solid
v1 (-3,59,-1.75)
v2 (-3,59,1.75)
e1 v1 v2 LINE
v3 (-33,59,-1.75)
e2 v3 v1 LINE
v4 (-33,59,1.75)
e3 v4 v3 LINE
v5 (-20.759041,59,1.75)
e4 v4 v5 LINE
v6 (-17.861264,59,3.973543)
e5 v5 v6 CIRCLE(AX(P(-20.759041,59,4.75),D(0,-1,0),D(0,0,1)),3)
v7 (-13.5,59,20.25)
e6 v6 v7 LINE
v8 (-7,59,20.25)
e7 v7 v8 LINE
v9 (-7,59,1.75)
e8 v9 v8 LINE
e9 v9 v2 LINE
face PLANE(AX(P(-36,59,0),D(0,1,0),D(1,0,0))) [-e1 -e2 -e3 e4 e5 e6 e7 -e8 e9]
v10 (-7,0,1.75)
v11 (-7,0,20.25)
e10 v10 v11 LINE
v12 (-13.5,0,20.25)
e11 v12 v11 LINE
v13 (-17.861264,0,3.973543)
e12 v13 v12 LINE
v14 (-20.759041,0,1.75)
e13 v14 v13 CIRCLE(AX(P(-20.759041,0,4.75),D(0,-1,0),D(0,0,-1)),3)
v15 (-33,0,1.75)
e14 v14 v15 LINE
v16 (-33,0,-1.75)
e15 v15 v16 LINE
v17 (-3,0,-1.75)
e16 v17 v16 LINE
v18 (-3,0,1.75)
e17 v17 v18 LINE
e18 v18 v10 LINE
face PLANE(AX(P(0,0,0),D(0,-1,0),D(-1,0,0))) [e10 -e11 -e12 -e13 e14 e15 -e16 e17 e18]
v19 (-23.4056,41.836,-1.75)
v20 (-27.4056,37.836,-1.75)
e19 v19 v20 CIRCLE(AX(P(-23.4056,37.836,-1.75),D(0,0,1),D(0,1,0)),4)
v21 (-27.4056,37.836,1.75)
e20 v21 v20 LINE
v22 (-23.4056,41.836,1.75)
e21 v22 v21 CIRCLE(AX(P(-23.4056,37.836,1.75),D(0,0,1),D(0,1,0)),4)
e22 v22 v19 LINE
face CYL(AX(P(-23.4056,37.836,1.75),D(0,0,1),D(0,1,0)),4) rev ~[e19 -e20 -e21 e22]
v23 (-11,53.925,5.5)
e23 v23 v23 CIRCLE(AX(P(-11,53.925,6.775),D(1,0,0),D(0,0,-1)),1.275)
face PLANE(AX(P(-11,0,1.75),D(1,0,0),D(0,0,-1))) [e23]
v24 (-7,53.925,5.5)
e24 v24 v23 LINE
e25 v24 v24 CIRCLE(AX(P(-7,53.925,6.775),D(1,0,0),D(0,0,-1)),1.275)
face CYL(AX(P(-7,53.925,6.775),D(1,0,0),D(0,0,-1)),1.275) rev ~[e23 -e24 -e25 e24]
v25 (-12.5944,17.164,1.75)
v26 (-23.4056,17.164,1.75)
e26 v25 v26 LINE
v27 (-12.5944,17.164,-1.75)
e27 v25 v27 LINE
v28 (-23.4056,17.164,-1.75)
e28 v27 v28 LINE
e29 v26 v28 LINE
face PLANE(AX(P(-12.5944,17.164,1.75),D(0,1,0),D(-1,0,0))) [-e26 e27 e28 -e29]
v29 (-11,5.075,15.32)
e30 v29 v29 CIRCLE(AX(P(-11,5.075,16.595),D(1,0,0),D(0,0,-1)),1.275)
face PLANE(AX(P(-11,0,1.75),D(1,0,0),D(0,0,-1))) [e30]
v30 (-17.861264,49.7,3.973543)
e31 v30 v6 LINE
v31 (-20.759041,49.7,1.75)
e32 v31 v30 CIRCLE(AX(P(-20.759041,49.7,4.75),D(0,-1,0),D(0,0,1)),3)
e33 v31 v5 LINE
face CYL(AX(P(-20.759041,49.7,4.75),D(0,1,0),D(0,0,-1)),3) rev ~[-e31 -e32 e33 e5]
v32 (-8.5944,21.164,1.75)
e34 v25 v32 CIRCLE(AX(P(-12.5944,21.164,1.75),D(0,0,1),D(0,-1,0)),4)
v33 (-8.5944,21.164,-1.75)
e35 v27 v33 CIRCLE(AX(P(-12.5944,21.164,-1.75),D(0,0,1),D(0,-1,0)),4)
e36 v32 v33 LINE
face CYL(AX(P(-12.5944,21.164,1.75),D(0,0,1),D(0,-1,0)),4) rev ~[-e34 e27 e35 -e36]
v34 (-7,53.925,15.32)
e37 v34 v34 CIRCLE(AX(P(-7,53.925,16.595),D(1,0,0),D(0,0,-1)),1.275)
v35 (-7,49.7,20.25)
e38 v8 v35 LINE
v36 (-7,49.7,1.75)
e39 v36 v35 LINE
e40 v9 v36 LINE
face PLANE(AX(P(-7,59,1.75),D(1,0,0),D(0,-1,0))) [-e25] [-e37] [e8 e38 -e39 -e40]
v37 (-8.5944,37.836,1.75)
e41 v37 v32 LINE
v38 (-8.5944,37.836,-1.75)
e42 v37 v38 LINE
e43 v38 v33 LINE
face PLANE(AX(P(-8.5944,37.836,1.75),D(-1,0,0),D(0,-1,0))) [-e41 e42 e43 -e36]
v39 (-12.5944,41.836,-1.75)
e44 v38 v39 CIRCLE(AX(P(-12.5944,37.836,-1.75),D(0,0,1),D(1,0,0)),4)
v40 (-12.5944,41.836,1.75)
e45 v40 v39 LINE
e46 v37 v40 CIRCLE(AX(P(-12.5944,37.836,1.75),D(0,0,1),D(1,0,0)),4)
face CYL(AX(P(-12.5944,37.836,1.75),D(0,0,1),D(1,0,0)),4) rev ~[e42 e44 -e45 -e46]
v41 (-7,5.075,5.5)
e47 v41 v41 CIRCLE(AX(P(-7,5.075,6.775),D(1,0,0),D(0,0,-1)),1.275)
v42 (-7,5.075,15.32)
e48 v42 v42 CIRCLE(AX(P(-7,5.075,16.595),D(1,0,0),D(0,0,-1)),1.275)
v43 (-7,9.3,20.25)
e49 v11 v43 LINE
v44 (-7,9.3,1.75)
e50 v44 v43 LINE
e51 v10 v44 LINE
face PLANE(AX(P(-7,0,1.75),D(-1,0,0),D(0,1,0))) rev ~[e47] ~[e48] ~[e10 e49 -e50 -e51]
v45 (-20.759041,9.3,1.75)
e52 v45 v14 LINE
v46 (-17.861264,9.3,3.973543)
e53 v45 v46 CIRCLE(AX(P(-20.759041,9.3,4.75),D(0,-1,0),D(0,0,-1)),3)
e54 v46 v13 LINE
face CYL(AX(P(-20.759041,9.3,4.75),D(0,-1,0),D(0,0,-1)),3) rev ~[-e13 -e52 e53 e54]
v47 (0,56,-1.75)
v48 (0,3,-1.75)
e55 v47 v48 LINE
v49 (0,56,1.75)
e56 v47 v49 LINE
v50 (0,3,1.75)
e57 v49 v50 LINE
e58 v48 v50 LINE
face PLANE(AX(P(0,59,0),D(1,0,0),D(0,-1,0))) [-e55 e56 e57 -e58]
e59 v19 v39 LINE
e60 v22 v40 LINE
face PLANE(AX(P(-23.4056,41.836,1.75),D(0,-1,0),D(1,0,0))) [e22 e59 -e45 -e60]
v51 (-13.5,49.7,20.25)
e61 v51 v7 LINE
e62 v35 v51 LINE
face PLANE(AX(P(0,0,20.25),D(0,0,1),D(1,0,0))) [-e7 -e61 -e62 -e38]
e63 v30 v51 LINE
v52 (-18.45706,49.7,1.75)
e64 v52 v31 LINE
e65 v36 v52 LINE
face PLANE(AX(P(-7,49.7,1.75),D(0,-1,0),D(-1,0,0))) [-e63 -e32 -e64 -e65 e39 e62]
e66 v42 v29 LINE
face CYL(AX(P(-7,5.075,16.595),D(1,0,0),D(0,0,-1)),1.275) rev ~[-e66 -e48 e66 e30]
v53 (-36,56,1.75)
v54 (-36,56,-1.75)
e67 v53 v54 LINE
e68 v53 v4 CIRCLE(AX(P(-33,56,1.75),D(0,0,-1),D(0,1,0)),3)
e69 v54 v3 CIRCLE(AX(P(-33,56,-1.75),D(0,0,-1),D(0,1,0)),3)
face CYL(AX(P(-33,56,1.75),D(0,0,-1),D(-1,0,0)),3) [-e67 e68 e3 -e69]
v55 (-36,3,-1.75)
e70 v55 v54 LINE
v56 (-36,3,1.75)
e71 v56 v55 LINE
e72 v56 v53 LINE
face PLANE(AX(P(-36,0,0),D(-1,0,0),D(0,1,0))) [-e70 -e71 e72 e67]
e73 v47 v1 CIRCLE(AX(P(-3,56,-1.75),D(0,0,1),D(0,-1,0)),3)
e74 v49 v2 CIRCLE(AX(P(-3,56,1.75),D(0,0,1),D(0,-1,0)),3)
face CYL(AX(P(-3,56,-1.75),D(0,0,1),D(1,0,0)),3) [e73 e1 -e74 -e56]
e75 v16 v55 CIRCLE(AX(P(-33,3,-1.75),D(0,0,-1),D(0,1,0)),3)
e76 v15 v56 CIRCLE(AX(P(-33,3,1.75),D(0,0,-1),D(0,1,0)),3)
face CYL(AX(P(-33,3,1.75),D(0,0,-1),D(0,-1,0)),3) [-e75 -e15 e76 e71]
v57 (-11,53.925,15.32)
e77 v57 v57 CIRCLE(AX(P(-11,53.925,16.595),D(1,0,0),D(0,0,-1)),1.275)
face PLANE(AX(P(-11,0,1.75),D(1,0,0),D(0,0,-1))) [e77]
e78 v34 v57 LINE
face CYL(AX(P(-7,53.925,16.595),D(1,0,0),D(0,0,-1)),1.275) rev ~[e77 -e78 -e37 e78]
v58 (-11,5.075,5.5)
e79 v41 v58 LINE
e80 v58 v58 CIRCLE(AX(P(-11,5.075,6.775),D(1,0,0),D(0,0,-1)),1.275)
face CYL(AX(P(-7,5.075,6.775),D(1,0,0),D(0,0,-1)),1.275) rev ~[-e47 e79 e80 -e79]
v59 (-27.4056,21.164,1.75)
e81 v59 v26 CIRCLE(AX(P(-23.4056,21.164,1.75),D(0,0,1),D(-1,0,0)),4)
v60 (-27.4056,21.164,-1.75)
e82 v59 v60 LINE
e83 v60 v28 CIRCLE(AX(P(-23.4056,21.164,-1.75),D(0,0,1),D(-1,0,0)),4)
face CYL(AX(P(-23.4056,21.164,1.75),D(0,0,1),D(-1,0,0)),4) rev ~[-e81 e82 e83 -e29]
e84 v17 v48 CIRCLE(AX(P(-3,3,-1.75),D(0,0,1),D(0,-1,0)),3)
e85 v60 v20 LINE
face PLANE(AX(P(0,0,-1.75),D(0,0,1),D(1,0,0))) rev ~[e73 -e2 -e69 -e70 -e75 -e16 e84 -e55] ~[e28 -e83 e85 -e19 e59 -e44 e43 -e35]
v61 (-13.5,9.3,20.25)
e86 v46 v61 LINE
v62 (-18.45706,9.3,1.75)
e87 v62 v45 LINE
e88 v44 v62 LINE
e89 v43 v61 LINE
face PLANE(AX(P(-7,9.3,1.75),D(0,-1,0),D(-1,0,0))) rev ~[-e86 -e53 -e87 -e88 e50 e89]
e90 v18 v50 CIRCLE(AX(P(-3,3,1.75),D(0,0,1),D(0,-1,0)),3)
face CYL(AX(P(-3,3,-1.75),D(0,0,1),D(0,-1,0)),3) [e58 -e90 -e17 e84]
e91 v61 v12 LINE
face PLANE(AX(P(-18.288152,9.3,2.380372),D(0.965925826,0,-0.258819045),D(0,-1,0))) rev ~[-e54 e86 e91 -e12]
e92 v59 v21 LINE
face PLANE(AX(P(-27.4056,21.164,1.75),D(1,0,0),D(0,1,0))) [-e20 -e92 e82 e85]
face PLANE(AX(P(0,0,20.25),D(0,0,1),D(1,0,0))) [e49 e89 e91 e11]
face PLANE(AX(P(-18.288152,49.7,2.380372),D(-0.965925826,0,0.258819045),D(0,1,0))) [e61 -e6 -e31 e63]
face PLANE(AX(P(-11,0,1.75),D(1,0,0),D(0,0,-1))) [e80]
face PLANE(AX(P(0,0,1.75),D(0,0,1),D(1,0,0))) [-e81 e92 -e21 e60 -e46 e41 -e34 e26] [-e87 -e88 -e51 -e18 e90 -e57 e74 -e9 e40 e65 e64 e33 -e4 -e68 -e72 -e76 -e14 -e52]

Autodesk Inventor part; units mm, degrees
ref_plane "YZ Plane" through (0, 0, 0) normal (1, 0, 0) x (0, 1, 0)
ref_plane "XZ Plane" through (0, 0, 0) normal (0, 1, 0) x (-1, 0, 0)
ref_plane "XY Plane" through (0, 0, 0) normal (0, 0, 1) x (1, 0, 0)
sketch "Base" plane through (0, 0, 0) normal (0, 0, 1) x (1, 0, 0)
  line L0 (0, 0) -> (-36, 0)
  line L1 (-36, 0) -> (-36, 59)
  line L2 (-36, 59) -> (0, 59)
  line L3 (0, 59) -> (0, 0)
  dimension "d0" = 36
  dimension "d1" = 59
extrude "Extrusion1" add sketch "Base" along normal mid plane 3.5
sketch "Attachment Towers" plane through (0, 0, 1.75) normal (0, 0, 1) x (1, 0, 0)
  line L0 (0, 29.5) -> (-7, 29.5) construction
  line L1 (-7, 29.5) -> (-7, 49.7) construction
  line L2 (-7, 29.5) -> (-7, 9.3) construction
  line L3 (-7, 49.7) -> (-13.5, 49.7)
  line L4 (-13.5, 49.7) -> (-13.5, 59)
  line L5 (-13.5, 59) -> (-7, 59)
  line L6 (-7, 59) -> (-7, 49.7)
  line L7 (-7, 9.3) -> (-13.5, 9.3)
  line L8 (-13.5, 9.3) -> (-13.5, 0)
  line L9 (-13.5, 0) -> (-7, 0)
  line L10 (-7, 0) -> (-7, 9.3)
  dimension "d41" = 7
  dimension "d44" = 40.4
  dimension "d45" = 6.5
  dimension "d46" = 9.3
extrude "Extrusion3" add sketch "Attachment Towers" along normal blind 18.5
sketch "Screw Holes" plane through (-7, 0, 1.75) normal (1, 0, 0) x (0, 0, -1)
  line L0 (0, 49.7) -> (0, 51.8) construction
  line L1 (0, 51.8) -> (-7.15, 51.8) construction
  circle A0 centre (-5.025, 53.925) radius 2.125 construction
  line L2 (-7.15, 51.8) -> (-7.15, 61.0367) construction
  line L3 (-2.9, 53.925) -> (-16.97, 53.925) construction
  circle A1 centre (-14.845, 53.925) radius 2.125 construction
  line L4 (-16.97, 51.8) -> (-16.97, 61.0367) construction
  circle A2 centre (-14.845, 53.925) radius 1.275
  circle A3 centre (-5.025, 53.925) radius 1.275
  line L5 (0, 29.5) -> (-35.6681, 29.5) construction
  circle A4 centre (-14.845, 5.075) radius 1.275
  circle A5 centre (-5.025, 5.075) radius 1.275
  dimension "d18" = 4.25
  dimension "d15" = 2.1
  dimension "d16" = 7.15
  dimension "d20" = 14.07
  dimension "d21" = 4.25
  dimension "d22" = 2.55
  dimension "d23" = 2.55
extrude "Extrusion4" cut sketch "Screw Holes" against normal blind 4
draft "FaceDraft1" angle 15 pull direction (0, 0, 1) faces at (-13.5, 6.2, 7.9167) (-13.5, 55.9, 7.9167) fixed edges at (-13.5, 4.65, 20.25) (-13.5, 54.35, 20.25)
sketch "Sketch5" plane through (0, 0, 1.75) normal (0, 0, 1) x (1, 0, 0)
  line L0 (-36, 29.5) -> (0, 29.5) construction
  line L1 (-23.4056, 41.836) -> (-12.5944, 41.836)
  line L2 (-8.5944, 37.836) -> (-8.5944, 21.164)
  line L3 (-12.5944, 17.164) -> (-23.4056, 17.164)
  line L4 (-27.4056, 21.164) -> (-27.4056, 37.836)
  line L5 (-27.4056, 41.836) -> (-8.5944, 17.164) construction
  line L6 (-8.5944, 41.836) -> (-27.4056, 17.164) construction
  arc A0 (-27.4056, 21.164) -> (-23.4056, 17.164) centre (-23.4056, 21.164) ccw
  arc A1 (-12.5944, 17.164) -> (-8.5944, 21.164) centre (-12.5944, 21.164) ccw
  arc A2 (-8.5944, 37.836) -> (-12.5944, 41.836) centre (-12.5944, 37.836) ccw
  arc A3 (-23.4056, 41.836) -> (-27.4056, 37.836) centre (-23.4056, 37.836) ccw
  point P0 (-18, 29.5)
  dimension "d47" = 4
extrude "Extrusion5" cut sketch "Sketch5" against normal through all
fillet "Fillet1" radius 3 6 edges at (0, 0, 0) (0, 59, 0) (-36, 59, 0) (-36, 0, 0) (-18.4571, 4.65, 1.75) (-18.4571, 54.35, 1.75)
sketch "Axle Reference" plane through (-7, 0, 1.75) normal (1, 0, 0) x (0, 0, -1)
  circle A0 centre (-14.845, 5.075) radius 1.275 construction
  circle A1 centre (-5.025, 5.075) radius 1.275 construction
  line L0 (-9.935, 5.075) -> (-9.935, 39.375) construction
  line L1 (-9.935, 53.925) -> (-9.935, 39.375) construction
  line L2 (-9.935, 39.375) -> (0, 39.375) construction
  line L3 (0, 56) -> (0, 3) construction
  circle A2 centre (-14.845, 5.075) radius 1.275 construction
  line L4 (-14.845, 5.075) -> (-5.025, 5.075) construction
  point P0 (1.75, 0)
  dimension "d48" = 34.3
  dimension "d49" = 14.55
  dimension "d50" = 9.935
  dimension "d51" = 9.82
properties part number "MG996R Attachment Test"
